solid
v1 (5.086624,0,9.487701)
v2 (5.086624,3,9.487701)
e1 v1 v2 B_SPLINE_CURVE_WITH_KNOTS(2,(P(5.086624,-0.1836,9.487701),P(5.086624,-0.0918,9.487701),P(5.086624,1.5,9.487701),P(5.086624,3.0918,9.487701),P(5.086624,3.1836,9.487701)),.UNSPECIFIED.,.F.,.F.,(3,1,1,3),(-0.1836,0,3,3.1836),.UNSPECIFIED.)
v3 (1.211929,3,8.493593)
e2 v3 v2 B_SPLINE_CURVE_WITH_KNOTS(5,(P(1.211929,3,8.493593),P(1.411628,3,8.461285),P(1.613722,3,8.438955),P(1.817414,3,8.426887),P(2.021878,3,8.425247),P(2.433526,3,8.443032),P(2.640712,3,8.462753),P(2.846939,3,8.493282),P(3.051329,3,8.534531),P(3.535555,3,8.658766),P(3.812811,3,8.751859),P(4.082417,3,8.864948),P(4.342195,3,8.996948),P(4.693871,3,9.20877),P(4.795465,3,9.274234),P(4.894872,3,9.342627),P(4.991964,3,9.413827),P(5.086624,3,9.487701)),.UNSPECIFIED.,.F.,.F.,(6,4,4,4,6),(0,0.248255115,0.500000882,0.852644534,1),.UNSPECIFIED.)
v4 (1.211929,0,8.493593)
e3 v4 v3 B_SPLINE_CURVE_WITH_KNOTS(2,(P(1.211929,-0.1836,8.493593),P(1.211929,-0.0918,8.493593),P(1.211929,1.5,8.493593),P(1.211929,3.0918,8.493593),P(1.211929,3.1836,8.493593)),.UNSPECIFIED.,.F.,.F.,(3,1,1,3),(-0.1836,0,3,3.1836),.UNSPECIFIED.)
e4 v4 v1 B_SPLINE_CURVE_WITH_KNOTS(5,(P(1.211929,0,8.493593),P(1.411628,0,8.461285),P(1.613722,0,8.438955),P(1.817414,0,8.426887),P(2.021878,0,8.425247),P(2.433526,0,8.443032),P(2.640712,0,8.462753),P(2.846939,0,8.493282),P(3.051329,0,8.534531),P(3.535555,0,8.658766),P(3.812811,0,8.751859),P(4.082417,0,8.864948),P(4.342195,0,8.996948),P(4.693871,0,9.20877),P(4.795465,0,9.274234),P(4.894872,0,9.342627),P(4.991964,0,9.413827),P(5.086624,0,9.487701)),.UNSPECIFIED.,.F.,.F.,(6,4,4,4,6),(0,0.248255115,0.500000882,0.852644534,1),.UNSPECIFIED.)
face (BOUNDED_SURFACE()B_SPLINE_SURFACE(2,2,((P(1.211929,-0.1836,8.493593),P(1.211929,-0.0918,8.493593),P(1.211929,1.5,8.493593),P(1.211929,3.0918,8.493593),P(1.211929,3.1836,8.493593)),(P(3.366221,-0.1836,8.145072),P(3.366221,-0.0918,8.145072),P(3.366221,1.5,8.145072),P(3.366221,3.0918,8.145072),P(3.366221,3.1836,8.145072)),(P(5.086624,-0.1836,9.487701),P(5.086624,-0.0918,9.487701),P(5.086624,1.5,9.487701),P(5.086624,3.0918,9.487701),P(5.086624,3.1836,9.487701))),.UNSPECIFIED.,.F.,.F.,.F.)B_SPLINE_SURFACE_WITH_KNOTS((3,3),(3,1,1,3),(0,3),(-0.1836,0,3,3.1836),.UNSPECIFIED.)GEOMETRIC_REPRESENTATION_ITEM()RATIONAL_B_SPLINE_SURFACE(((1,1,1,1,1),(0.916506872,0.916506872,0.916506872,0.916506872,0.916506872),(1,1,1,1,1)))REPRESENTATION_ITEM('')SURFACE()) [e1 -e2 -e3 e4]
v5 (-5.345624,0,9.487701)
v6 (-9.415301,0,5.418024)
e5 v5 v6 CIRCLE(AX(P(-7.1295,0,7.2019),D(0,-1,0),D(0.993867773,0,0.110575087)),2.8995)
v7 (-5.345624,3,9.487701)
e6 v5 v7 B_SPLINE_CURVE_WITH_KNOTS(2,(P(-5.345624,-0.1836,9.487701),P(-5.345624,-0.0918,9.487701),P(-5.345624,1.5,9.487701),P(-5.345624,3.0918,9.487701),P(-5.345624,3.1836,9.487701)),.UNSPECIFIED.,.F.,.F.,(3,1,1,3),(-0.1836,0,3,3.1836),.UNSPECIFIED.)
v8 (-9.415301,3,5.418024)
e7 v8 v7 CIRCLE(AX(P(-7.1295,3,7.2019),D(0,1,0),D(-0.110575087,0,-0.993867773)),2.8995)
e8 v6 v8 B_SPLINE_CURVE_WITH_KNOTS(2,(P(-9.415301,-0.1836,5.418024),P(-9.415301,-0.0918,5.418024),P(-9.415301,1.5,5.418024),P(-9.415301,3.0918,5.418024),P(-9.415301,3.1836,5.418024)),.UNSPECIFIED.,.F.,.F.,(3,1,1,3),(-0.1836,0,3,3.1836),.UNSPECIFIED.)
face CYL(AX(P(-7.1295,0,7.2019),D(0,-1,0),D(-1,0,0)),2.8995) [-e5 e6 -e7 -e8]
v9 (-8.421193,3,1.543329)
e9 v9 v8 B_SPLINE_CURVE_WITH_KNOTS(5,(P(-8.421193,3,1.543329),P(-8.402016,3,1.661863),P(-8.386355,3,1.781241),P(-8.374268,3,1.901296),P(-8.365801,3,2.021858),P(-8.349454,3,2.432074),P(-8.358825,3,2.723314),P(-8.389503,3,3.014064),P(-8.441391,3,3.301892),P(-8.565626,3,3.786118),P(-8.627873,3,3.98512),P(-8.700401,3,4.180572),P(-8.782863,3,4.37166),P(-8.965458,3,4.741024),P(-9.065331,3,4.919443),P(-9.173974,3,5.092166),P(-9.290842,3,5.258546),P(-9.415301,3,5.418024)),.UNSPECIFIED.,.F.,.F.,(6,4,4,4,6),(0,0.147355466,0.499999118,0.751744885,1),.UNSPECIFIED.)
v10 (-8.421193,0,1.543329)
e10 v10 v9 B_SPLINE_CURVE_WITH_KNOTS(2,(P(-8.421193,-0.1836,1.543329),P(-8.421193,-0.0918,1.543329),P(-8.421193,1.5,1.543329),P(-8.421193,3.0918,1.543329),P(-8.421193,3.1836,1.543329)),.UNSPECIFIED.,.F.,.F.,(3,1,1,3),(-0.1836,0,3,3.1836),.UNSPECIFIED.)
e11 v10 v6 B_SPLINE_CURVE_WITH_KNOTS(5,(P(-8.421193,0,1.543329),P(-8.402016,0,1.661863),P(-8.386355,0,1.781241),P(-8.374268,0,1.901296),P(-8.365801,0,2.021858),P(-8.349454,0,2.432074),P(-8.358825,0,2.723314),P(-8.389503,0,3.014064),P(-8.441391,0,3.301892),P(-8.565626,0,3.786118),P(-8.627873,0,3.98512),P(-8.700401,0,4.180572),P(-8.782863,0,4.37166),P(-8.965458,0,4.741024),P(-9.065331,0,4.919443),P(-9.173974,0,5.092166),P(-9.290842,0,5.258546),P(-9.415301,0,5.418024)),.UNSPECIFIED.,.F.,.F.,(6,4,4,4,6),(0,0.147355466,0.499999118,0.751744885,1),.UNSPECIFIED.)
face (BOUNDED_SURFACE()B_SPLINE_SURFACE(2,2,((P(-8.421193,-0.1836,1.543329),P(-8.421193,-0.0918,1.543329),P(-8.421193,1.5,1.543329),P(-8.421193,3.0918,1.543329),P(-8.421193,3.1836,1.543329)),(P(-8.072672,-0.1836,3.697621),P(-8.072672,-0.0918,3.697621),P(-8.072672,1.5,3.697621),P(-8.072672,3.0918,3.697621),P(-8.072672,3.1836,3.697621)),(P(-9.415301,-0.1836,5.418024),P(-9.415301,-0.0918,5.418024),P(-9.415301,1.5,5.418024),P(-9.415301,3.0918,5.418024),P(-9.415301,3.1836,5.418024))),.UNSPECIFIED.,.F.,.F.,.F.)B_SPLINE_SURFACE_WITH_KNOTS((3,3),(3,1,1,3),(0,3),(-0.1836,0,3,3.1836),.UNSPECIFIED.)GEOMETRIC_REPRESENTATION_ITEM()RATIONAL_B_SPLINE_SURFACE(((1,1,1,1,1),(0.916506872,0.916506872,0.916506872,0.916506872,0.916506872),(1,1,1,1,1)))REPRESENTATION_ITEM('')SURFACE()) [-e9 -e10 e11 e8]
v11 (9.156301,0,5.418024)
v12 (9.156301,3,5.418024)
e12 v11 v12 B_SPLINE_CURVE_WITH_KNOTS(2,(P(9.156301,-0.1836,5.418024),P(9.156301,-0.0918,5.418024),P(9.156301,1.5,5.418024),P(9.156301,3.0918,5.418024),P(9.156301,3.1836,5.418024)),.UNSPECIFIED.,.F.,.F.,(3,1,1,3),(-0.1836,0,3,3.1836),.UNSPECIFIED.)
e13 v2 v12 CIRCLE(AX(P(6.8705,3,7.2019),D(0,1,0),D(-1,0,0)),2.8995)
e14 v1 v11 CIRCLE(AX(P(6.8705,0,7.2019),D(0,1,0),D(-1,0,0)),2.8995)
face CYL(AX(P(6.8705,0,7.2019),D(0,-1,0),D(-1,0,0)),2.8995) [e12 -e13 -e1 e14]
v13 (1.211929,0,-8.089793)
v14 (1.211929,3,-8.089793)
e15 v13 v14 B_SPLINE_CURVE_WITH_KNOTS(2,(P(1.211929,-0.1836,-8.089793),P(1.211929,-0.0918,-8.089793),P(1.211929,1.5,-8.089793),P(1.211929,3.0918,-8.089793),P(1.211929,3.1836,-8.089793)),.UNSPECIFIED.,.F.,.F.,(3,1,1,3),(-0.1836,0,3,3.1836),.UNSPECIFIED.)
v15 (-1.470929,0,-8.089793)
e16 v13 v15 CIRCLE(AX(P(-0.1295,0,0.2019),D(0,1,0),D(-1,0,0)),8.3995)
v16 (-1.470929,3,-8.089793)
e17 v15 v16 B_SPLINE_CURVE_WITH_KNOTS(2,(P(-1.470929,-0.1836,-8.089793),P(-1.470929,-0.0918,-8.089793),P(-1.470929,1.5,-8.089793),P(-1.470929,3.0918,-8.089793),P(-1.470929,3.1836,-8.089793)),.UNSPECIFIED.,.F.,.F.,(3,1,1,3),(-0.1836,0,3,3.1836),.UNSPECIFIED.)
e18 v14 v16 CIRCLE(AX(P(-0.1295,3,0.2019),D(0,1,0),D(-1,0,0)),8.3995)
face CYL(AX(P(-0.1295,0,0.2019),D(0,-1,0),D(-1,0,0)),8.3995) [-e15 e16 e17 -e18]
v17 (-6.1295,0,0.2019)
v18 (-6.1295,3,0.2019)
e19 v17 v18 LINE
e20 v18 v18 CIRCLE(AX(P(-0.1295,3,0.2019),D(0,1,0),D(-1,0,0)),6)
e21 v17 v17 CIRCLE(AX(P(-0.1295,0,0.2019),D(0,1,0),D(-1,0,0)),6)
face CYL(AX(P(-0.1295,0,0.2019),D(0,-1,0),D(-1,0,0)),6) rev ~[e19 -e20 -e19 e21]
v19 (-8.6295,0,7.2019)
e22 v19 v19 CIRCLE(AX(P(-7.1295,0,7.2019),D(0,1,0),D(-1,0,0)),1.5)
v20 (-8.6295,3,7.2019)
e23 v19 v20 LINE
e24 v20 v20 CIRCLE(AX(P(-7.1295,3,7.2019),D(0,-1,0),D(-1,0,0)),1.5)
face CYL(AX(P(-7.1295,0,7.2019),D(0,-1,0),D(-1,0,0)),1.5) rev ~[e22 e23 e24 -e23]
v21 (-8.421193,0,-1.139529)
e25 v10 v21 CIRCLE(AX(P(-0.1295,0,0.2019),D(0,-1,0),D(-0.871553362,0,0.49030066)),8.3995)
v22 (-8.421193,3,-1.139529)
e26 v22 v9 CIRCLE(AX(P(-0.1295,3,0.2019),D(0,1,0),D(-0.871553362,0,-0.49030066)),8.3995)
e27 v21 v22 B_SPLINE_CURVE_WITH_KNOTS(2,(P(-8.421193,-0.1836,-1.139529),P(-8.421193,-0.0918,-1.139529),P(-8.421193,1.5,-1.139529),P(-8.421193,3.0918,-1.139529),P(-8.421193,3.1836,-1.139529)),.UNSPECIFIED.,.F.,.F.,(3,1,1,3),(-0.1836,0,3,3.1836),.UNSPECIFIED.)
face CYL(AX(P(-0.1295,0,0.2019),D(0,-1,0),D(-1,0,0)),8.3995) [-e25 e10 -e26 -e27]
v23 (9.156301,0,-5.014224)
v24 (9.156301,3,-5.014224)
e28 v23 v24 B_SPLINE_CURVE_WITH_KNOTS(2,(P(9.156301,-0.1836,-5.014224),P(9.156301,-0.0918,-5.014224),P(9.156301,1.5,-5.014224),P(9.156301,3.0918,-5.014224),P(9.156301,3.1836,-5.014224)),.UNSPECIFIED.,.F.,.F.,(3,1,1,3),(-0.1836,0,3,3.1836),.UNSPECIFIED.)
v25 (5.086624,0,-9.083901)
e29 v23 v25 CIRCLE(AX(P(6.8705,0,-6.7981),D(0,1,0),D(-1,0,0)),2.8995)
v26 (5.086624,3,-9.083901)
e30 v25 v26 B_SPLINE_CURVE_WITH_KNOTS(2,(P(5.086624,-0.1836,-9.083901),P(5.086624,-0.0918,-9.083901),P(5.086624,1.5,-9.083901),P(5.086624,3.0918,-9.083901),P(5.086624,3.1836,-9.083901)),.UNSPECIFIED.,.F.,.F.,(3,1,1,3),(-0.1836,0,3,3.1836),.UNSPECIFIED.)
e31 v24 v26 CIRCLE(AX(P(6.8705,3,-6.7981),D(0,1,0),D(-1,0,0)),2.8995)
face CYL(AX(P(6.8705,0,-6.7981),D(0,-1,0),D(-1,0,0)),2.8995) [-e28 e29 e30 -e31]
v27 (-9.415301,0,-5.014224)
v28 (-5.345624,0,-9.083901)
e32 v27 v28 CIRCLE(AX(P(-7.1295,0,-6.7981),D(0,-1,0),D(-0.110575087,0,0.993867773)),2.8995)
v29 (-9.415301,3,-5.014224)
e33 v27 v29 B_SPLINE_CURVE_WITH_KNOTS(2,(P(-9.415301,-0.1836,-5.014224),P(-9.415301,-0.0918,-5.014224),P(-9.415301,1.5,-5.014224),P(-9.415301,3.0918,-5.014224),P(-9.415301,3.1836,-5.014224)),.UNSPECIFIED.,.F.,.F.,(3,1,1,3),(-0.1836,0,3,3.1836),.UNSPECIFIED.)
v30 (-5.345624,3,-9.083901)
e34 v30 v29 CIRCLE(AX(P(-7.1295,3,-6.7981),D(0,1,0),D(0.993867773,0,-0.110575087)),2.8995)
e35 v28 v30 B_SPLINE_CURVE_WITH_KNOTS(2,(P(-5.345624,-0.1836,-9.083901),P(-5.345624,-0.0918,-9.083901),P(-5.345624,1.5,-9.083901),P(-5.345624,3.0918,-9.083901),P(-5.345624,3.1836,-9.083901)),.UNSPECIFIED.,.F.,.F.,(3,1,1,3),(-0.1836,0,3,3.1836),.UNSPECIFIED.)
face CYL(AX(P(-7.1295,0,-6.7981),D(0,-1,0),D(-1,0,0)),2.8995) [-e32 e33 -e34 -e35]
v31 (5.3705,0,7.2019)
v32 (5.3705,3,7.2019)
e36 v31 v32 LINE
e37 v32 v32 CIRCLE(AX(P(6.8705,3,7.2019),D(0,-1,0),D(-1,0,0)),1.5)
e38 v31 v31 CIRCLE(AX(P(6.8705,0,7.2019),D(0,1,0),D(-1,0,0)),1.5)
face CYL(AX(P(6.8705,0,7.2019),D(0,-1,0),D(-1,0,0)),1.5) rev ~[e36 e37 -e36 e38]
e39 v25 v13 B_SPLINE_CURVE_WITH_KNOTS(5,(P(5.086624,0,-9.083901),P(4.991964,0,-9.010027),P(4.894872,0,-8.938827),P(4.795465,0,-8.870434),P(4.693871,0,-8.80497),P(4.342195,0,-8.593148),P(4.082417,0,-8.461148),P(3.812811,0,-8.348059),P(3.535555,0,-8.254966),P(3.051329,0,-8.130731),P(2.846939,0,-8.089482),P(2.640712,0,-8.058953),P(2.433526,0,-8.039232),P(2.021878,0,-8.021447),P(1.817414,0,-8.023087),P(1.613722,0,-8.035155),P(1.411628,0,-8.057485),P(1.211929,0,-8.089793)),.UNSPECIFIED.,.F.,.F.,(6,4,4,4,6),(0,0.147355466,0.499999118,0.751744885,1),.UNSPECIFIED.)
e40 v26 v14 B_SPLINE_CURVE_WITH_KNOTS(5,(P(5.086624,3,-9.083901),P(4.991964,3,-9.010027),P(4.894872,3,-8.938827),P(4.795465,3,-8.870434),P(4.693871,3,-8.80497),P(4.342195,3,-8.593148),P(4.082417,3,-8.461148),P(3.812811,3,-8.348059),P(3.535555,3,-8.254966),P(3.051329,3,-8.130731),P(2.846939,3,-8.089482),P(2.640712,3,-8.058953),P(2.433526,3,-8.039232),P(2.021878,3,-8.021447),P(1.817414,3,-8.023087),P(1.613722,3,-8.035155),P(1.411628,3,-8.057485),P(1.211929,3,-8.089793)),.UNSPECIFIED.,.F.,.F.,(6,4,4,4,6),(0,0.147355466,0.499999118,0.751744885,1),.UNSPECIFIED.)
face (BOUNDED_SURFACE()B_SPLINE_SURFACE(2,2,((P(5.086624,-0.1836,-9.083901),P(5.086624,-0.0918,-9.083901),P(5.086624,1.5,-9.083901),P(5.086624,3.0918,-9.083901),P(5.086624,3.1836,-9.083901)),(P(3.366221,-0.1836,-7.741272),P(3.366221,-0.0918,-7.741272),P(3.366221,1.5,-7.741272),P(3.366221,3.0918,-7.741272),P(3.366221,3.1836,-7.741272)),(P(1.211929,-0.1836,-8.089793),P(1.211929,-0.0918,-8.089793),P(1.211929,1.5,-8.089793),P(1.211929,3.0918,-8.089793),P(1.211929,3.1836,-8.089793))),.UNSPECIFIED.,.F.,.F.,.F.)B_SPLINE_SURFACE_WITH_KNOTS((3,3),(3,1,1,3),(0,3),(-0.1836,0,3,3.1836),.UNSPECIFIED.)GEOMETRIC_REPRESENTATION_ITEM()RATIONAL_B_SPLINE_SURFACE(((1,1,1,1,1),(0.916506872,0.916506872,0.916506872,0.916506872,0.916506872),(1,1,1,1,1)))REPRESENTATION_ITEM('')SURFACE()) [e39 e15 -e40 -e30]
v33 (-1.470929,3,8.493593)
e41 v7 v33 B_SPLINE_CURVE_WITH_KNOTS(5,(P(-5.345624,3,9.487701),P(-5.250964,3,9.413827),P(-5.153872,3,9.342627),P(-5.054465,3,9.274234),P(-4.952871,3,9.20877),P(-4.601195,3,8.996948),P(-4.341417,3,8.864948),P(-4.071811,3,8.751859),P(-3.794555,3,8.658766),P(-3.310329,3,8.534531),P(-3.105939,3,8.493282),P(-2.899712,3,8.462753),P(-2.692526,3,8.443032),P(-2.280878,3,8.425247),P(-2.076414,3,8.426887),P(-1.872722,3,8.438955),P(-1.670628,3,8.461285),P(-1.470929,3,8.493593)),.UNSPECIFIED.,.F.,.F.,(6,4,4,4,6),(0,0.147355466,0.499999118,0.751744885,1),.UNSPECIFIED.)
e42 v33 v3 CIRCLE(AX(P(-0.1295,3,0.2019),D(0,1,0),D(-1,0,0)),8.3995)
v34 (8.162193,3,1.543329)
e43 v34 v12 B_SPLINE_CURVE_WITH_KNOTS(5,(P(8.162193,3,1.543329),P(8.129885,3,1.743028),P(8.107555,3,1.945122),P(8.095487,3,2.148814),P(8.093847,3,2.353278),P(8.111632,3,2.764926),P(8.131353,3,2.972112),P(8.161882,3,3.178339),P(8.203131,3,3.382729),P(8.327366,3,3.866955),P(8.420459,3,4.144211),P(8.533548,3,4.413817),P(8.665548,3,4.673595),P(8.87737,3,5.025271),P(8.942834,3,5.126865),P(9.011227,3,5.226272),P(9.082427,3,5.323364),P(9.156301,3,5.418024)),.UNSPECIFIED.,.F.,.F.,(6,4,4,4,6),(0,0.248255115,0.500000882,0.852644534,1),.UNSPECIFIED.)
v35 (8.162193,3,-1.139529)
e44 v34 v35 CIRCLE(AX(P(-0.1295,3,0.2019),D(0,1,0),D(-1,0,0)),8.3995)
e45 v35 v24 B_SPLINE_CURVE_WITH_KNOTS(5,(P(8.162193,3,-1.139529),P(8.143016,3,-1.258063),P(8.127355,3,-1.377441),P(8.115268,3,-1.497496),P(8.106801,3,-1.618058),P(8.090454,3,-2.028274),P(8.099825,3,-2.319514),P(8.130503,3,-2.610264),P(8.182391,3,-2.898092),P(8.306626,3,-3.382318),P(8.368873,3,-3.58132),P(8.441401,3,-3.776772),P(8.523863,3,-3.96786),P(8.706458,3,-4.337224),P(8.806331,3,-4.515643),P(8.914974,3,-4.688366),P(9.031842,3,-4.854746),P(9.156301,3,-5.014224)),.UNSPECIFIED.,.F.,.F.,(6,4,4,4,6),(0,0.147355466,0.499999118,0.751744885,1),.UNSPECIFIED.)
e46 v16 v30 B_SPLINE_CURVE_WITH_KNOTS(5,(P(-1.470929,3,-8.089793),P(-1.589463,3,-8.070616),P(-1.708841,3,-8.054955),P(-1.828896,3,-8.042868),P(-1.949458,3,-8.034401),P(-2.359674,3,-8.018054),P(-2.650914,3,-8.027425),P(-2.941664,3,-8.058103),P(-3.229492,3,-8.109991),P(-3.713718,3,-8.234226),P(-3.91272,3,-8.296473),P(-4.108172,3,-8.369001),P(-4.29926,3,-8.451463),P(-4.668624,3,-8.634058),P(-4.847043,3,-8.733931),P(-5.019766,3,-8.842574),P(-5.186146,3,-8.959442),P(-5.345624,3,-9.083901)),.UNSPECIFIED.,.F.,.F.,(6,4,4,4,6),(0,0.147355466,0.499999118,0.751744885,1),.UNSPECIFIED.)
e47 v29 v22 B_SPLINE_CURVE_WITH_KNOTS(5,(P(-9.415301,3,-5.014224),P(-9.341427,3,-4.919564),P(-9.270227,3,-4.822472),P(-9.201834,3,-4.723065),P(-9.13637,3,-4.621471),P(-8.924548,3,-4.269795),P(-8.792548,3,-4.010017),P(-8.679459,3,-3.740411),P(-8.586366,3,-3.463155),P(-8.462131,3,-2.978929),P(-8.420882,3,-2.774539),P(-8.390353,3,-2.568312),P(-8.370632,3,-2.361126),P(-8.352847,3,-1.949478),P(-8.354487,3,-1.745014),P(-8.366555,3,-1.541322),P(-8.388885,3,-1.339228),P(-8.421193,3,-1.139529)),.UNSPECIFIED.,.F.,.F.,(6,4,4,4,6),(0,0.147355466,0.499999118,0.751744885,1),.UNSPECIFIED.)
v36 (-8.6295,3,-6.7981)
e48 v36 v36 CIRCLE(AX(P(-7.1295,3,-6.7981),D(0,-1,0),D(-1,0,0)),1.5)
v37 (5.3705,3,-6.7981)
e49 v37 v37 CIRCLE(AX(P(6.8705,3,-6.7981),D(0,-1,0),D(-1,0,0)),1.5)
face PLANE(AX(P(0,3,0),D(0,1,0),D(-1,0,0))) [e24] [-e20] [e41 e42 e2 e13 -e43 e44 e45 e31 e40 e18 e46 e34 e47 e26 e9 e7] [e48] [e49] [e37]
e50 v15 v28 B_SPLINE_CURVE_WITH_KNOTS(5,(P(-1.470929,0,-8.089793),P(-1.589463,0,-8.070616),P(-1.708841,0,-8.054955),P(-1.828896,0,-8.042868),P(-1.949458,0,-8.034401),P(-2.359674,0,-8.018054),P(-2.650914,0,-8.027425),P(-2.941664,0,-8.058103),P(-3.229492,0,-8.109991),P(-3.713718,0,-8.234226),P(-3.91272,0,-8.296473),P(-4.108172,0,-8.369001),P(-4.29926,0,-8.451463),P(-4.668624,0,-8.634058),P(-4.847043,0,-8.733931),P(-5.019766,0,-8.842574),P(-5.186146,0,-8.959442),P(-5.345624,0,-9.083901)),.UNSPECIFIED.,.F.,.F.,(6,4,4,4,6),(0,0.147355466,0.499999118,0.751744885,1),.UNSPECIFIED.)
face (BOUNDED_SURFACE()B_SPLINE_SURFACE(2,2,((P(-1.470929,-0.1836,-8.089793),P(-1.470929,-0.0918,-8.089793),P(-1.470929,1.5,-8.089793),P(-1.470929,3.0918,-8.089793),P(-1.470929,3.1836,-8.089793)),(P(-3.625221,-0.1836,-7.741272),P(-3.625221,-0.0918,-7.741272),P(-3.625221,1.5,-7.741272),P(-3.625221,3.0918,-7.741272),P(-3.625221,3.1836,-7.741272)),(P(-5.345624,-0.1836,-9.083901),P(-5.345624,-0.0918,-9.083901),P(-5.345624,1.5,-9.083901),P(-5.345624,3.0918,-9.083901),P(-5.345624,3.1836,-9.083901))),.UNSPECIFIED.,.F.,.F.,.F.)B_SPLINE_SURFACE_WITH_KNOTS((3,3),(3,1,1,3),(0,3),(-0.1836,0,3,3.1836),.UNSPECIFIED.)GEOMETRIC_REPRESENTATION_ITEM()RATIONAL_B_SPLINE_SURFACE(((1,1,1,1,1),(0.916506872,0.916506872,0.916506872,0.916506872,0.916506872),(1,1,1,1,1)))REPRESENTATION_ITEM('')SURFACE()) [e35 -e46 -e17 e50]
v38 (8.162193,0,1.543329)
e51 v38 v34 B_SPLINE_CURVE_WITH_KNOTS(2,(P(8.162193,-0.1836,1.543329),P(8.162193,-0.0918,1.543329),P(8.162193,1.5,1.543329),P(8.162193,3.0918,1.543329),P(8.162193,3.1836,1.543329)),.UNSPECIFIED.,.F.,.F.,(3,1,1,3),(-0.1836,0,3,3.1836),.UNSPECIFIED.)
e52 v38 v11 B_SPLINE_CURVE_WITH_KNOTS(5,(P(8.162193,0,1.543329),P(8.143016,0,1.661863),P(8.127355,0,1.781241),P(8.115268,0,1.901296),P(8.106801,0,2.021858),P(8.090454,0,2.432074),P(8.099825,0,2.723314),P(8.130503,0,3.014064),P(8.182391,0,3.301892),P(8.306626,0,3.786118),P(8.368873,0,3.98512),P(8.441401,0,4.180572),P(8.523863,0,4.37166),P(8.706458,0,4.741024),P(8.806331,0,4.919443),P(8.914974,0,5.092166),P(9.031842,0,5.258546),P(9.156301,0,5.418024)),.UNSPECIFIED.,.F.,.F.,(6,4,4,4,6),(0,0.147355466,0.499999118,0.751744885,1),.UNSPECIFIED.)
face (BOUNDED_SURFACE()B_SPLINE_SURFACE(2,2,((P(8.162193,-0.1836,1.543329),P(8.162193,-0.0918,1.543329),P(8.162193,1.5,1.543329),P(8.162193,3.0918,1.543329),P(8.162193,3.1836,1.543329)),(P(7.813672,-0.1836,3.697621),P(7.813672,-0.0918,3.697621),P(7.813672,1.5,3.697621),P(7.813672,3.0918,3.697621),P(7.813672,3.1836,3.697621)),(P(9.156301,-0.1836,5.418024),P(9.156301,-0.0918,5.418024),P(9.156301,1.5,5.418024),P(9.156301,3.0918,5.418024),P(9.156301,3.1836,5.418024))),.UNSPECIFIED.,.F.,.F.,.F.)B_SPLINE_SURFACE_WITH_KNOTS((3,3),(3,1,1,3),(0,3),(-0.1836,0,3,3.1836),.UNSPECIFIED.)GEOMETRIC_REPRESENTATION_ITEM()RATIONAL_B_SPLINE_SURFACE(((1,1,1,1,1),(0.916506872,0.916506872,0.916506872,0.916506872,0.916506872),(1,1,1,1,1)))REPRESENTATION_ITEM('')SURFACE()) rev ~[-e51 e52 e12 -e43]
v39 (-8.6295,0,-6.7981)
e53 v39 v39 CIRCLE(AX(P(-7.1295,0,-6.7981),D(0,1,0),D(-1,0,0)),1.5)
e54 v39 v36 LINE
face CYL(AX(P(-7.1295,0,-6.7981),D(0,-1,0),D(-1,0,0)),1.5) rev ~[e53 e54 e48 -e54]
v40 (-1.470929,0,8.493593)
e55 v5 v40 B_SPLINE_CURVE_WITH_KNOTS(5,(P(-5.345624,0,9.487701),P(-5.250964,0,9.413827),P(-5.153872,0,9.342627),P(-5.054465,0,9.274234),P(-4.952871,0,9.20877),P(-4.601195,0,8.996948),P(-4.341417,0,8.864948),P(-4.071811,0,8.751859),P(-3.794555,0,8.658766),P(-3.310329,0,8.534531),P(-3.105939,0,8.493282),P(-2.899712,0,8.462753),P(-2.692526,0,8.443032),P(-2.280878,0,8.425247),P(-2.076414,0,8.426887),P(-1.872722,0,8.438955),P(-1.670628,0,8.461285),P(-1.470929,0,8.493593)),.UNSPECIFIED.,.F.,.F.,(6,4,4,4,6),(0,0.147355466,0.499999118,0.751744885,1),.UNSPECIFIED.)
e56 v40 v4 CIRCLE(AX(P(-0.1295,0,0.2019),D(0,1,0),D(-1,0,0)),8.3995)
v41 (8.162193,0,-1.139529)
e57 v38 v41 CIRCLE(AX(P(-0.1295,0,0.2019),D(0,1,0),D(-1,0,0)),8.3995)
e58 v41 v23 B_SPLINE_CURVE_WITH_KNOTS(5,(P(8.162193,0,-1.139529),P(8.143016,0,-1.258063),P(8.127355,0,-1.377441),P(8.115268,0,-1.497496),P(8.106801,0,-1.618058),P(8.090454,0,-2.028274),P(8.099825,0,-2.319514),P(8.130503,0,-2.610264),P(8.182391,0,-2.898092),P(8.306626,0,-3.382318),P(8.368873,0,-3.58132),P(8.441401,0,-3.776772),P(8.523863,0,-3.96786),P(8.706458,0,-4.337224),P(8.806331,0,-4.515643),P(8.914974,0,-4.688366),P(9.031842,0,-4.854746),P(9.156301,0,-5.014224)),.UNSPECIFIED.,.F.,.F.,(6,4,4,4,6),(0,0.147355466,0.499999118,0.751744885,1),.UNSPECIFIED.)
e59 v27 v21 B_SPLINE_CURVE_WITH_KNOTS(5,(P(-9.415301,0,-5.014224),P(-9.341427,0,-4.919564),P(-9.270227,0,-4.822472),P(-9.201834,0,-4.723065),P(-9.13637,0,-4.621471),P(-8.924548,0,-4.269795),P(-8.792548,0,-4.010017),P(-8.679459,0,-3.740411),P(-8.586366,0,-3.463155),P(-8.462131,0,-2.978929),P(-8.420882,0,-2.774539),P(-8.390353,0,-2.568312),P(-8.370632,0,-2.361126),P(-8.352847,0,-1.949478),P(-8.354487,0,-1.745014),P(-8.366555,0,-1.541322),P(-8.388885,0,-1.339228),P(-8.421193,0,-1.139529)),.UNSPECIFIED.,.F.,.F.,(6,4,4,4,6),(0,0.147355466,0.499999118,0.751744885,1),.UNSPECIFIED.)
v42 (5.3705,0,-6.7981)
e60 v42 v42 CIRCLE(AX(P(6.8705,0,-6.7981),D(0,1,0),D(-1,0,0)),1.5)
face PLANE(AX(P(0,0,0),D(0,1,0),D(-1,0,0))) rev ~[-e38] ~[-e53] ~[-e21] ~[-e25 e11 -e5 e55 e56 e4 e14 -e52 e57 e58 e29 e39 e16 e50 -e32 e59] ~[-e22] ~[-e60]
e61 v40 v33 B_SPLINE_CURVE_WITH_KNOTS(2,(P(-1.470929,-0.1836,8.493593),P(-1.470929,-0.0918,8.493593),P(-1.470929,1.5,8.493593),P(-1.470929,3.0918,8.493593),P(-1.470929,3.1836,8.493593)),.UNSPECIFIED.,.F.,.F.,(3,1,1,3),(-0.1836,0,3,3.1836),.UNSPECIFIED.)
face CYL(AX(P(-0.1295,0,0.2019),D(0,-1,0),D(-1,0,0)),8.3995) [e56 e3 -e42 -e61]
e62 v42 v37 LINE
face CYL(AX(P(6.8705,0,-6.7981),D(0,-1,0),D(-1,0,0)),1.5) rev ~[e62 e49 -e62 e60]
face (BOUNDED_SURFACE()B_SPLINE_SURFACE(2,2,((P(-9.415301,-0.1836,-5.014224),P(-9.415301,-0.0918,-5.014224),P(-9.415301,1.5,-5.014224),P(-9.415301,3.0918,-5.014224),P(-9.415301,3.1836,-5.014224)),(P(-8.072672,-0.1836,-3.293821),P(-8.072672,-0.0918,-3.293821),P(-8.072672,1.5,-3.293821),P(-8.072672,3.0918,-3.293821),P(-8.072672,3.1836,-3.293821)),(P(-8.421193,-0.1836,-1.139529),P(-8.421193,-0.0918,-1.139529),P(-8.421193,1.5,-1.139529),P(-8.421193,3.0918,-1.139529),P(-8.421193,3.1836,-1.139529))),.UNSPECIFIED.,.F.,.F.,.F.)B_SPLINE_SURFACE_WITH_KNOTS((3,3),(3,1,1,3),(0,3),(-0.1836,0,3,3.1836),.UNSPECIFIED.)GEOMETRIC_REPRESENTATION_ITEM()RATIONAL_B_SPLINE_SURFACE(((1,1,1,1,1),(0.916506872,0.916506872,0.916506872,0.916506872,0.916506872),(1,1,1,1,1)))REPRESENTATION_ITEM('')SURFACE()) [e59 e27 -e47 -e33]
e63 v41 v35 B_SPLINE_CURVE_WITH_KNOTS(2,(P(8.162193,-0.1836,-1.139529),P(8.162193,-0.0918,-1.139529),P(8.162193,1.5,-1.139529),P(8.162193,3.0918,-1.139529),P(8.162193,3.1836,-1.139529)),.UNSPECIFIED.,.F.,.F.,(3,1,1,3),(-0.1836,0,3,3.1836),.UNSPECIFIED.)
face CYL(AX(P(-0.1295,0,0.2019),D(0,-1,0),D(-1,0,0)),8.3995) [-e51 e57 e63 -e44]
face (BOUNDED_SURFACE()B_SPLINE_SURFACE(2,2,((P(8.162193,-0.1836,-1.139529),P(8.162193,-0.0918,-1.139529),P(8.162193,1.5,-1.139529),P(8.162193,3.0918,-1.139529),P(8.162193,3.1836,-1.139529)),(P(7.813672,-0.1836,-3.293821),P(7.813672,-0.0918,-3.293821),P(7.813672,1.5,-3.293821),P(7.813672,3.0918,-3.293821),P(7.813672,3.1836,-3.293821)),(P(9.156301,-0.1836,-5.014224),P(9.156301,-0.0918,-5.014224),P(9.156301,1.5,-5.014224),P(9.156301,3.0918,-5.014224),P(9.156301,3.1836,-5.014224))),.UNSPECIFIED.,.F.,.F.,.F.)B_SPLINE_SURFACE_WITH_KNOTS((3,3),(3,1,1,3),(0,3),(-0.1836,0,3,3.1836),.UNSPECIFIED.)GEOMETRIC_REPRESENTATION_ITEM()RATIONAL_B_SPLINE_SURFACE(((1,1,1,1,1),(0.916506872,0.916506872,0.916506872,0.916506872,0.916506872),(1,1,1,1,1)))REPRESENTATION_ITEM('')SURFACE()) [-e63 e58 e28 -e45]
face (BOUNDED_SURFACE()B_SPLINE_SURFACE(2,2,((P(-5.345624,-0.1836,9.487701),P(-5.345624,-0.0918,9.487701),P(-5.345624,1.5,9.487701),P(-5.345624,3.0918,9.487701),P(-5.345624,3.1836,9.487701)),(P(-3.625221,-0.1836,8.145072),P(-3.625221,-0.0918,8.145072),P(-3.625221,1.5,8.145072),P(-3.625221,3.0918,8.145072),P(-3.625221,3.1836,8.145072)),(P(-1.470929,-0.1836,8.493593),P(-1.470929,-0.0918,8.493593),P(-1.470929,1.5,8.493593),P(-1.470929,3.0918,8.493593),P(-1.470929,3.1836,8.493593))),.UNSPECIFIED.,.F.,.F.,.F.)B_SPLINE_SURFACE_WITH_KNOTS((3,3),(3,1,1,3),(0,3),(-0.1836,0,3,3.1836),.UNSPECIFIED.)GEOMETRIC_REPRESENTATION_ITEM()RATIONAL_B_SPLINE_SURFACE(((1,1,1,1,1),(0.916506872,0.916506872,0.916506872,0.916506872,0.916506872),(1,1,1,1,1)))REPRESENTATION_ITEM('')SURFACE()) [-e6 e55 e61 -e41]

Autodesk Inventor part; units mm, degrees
ref_plane "YZ Plane" through (0, 0, 0) normal (1, 0, 0) x (0, 1, 0)
ref_plane "XZ Plane" through (0, 0, 0) normal (0, 1, 0) x (-1, 0, 0)
ref_plane "XY Plane" through (0, 0, 0) normal (0, 0, 1) x (1, 0, 0)
sketch "Эскиз1" plane through (0, 0, 0) normal (0, 1, 0) x (-1, 0, 0)
  circle A0 centre (0.1295, 0.2019) radius 7
  circle A1 centre (-6.8705, 7.2019) radius 1.5
  circle A2 centre (7.1295, 7.2019) radius 1.5
  circle A3 centre (7.1295, -6.7981) radius 1.5
  circle A4 centre (-6.8705, -6.7981) radius 1.5
  line L0 (-6.8705, -10.8093) -> (-6.8705, 13.8282) construction
  line L1 (14.3213, 7.2019) -> (-16.097, 7.2019) construction
  line L2 (7.1295, -11.068) -> (7.1295, 16.1729) construction
  arc A5 (6.5047, 14.6631) -> (7.1295, 16.1729) centre (4.9928, 16.1729) ccw construction
  line L3 (12.5583, -6.7981) -> (-15.6188, -6.7981) construction
  circle A6 centre (7.1295, 7.2019) radius 2.8995
  circle A7 centre (-6.8705, 7.2019) radius 2.8995
  circle A8 centre (-6.8705, -6.7981) radius 2.8995
  circle A9 centre (7.1295, -6.7981) radius 2.8995
  arc A10 (0.5599, -6.4772) -> (-0.2768, -6.4772) centre (0.1416, -8.4329) ccw
  line L4 (5.6295, -6.7981) -> (0.1295, -6.7981)
  line L5 (7.1295, -5.2981) -> (7.1295, 0.2019)
  line L6 (7.1295, 5.7019) -> (7.1295, 0.2019)
  line L7 (5.6295, 7.2019) -> (-5.3705, 7.2019)
  line L8 (-6.8705, 5.7019) -> (-6.8705, -5.2981)
  line L9 (-5.3705, -6.7981) -> (0.1295, -6.7981)
  circle A11 centre (0.1295, 0.2019) radius 8.3995
  circle A12 centre (0.1295, 0.2019) radius 6
  point P0 (-3.971, 7.2019)
  point P1 (-6.8705, 4.3024)
  point P2 (-6.8705, -3.8986)
  point P3 (-3.971, -6.7981)
  point P4 (4.23, -6.7981)
  point P5 (7.1295, -3.8986)
  point P6 (7.1295, 4.3024)
  point P7 (4.23, 7.2019)
  point P8 (4.2478, 7.5225)
  point P9 (-3.9888, 7.5225)
  point P10 (-7.1911, 4.3202)
  point P11 (-7.1911, -3.9164)
  point P12 (-3.9888, -7.1187)
  point P13 (4.2478, -7.1187)
  point P14 (7.4501, -3.9164)
  point P15 (7.4501, 4.3202)
  dimension "d23" = 14
  dimension "d24" = 3
  dimension "d25" = 3
  dimension "d26" = 3
  dimension "d27" = 3
  dimension "d28" = 2
  dimension "d40" = 12
extrude "Выдавливание1" add sketch "Эскиз1" along normal blind 3 contours L5 A9 A0 | L6 A6 A11 A9 L5 | A0 A6 L6 | A0 L7 A6 | A6 L7 A11 L6 | A9 L4 A0 | A9 L5 A11 L4 | A9 A11 L5 | L6 A11 A6 | L7 A7 A11 A6 | A0 A7 L7 | A6 A11 L7 | L9 A8 A0 | L4 A9 A11 A8 L9 | L4 A11 A9 | A9 A11 L4 A3 L5 | L5 A3 A11 | A11 L6 A2 L7 A6 | A11 A2 L6 | A0 L8 A7 | A7 L8 A11 L7 | L7 A11 A7 | L7 A2 A11 | A8 L8 A0 | A8 L9 A11 L8 | A8 A11 L9 | A11 A3 L4 | L8 A8 A11 A7 | A7 A11 L8 | A11 L7 A1 L8 A7 | A11 A1 L7 | L8 A11 A8 | A8 A11 L8 A4 L9 | L9 A4 A11 | L8 A1 A11 | A11 A4 L8
extrude "Выдавливание3" add sketch "Эскиз1" along normal up to surface (3 mm away) contours A0
fillet "Сопряжение грани1" radius 5 2 edges at (-4.2478, 1.5, 7.5225) (-7.4501, 1.5, 4.3202)
fillet "Сопряжение грани2" radius 5 2 edges at (3.9888, 1.5, 7.5225) (7.1911, 1.5, 4.3202)
fillet_without_effect "Сопряжение грани3"
fillet "Сопряжение грани4" radius 5 2 edges at (7.1911, 1.5, -3.9164) (3.9888, 1.5, -7.1187)
fillet "Сопряжение грани5" radius 5 2 edges at (-4.2478, 1.5, -7.1187) (-7.4501, 1.5, -3.9164)
fillet_without_effect "Сопряжение грани6"
fillet_without_effect "Сопряжение грани7"
fillet_without_effect "Сопряжение грани8"
properties part number "крепление подшипника_1_CPY"
